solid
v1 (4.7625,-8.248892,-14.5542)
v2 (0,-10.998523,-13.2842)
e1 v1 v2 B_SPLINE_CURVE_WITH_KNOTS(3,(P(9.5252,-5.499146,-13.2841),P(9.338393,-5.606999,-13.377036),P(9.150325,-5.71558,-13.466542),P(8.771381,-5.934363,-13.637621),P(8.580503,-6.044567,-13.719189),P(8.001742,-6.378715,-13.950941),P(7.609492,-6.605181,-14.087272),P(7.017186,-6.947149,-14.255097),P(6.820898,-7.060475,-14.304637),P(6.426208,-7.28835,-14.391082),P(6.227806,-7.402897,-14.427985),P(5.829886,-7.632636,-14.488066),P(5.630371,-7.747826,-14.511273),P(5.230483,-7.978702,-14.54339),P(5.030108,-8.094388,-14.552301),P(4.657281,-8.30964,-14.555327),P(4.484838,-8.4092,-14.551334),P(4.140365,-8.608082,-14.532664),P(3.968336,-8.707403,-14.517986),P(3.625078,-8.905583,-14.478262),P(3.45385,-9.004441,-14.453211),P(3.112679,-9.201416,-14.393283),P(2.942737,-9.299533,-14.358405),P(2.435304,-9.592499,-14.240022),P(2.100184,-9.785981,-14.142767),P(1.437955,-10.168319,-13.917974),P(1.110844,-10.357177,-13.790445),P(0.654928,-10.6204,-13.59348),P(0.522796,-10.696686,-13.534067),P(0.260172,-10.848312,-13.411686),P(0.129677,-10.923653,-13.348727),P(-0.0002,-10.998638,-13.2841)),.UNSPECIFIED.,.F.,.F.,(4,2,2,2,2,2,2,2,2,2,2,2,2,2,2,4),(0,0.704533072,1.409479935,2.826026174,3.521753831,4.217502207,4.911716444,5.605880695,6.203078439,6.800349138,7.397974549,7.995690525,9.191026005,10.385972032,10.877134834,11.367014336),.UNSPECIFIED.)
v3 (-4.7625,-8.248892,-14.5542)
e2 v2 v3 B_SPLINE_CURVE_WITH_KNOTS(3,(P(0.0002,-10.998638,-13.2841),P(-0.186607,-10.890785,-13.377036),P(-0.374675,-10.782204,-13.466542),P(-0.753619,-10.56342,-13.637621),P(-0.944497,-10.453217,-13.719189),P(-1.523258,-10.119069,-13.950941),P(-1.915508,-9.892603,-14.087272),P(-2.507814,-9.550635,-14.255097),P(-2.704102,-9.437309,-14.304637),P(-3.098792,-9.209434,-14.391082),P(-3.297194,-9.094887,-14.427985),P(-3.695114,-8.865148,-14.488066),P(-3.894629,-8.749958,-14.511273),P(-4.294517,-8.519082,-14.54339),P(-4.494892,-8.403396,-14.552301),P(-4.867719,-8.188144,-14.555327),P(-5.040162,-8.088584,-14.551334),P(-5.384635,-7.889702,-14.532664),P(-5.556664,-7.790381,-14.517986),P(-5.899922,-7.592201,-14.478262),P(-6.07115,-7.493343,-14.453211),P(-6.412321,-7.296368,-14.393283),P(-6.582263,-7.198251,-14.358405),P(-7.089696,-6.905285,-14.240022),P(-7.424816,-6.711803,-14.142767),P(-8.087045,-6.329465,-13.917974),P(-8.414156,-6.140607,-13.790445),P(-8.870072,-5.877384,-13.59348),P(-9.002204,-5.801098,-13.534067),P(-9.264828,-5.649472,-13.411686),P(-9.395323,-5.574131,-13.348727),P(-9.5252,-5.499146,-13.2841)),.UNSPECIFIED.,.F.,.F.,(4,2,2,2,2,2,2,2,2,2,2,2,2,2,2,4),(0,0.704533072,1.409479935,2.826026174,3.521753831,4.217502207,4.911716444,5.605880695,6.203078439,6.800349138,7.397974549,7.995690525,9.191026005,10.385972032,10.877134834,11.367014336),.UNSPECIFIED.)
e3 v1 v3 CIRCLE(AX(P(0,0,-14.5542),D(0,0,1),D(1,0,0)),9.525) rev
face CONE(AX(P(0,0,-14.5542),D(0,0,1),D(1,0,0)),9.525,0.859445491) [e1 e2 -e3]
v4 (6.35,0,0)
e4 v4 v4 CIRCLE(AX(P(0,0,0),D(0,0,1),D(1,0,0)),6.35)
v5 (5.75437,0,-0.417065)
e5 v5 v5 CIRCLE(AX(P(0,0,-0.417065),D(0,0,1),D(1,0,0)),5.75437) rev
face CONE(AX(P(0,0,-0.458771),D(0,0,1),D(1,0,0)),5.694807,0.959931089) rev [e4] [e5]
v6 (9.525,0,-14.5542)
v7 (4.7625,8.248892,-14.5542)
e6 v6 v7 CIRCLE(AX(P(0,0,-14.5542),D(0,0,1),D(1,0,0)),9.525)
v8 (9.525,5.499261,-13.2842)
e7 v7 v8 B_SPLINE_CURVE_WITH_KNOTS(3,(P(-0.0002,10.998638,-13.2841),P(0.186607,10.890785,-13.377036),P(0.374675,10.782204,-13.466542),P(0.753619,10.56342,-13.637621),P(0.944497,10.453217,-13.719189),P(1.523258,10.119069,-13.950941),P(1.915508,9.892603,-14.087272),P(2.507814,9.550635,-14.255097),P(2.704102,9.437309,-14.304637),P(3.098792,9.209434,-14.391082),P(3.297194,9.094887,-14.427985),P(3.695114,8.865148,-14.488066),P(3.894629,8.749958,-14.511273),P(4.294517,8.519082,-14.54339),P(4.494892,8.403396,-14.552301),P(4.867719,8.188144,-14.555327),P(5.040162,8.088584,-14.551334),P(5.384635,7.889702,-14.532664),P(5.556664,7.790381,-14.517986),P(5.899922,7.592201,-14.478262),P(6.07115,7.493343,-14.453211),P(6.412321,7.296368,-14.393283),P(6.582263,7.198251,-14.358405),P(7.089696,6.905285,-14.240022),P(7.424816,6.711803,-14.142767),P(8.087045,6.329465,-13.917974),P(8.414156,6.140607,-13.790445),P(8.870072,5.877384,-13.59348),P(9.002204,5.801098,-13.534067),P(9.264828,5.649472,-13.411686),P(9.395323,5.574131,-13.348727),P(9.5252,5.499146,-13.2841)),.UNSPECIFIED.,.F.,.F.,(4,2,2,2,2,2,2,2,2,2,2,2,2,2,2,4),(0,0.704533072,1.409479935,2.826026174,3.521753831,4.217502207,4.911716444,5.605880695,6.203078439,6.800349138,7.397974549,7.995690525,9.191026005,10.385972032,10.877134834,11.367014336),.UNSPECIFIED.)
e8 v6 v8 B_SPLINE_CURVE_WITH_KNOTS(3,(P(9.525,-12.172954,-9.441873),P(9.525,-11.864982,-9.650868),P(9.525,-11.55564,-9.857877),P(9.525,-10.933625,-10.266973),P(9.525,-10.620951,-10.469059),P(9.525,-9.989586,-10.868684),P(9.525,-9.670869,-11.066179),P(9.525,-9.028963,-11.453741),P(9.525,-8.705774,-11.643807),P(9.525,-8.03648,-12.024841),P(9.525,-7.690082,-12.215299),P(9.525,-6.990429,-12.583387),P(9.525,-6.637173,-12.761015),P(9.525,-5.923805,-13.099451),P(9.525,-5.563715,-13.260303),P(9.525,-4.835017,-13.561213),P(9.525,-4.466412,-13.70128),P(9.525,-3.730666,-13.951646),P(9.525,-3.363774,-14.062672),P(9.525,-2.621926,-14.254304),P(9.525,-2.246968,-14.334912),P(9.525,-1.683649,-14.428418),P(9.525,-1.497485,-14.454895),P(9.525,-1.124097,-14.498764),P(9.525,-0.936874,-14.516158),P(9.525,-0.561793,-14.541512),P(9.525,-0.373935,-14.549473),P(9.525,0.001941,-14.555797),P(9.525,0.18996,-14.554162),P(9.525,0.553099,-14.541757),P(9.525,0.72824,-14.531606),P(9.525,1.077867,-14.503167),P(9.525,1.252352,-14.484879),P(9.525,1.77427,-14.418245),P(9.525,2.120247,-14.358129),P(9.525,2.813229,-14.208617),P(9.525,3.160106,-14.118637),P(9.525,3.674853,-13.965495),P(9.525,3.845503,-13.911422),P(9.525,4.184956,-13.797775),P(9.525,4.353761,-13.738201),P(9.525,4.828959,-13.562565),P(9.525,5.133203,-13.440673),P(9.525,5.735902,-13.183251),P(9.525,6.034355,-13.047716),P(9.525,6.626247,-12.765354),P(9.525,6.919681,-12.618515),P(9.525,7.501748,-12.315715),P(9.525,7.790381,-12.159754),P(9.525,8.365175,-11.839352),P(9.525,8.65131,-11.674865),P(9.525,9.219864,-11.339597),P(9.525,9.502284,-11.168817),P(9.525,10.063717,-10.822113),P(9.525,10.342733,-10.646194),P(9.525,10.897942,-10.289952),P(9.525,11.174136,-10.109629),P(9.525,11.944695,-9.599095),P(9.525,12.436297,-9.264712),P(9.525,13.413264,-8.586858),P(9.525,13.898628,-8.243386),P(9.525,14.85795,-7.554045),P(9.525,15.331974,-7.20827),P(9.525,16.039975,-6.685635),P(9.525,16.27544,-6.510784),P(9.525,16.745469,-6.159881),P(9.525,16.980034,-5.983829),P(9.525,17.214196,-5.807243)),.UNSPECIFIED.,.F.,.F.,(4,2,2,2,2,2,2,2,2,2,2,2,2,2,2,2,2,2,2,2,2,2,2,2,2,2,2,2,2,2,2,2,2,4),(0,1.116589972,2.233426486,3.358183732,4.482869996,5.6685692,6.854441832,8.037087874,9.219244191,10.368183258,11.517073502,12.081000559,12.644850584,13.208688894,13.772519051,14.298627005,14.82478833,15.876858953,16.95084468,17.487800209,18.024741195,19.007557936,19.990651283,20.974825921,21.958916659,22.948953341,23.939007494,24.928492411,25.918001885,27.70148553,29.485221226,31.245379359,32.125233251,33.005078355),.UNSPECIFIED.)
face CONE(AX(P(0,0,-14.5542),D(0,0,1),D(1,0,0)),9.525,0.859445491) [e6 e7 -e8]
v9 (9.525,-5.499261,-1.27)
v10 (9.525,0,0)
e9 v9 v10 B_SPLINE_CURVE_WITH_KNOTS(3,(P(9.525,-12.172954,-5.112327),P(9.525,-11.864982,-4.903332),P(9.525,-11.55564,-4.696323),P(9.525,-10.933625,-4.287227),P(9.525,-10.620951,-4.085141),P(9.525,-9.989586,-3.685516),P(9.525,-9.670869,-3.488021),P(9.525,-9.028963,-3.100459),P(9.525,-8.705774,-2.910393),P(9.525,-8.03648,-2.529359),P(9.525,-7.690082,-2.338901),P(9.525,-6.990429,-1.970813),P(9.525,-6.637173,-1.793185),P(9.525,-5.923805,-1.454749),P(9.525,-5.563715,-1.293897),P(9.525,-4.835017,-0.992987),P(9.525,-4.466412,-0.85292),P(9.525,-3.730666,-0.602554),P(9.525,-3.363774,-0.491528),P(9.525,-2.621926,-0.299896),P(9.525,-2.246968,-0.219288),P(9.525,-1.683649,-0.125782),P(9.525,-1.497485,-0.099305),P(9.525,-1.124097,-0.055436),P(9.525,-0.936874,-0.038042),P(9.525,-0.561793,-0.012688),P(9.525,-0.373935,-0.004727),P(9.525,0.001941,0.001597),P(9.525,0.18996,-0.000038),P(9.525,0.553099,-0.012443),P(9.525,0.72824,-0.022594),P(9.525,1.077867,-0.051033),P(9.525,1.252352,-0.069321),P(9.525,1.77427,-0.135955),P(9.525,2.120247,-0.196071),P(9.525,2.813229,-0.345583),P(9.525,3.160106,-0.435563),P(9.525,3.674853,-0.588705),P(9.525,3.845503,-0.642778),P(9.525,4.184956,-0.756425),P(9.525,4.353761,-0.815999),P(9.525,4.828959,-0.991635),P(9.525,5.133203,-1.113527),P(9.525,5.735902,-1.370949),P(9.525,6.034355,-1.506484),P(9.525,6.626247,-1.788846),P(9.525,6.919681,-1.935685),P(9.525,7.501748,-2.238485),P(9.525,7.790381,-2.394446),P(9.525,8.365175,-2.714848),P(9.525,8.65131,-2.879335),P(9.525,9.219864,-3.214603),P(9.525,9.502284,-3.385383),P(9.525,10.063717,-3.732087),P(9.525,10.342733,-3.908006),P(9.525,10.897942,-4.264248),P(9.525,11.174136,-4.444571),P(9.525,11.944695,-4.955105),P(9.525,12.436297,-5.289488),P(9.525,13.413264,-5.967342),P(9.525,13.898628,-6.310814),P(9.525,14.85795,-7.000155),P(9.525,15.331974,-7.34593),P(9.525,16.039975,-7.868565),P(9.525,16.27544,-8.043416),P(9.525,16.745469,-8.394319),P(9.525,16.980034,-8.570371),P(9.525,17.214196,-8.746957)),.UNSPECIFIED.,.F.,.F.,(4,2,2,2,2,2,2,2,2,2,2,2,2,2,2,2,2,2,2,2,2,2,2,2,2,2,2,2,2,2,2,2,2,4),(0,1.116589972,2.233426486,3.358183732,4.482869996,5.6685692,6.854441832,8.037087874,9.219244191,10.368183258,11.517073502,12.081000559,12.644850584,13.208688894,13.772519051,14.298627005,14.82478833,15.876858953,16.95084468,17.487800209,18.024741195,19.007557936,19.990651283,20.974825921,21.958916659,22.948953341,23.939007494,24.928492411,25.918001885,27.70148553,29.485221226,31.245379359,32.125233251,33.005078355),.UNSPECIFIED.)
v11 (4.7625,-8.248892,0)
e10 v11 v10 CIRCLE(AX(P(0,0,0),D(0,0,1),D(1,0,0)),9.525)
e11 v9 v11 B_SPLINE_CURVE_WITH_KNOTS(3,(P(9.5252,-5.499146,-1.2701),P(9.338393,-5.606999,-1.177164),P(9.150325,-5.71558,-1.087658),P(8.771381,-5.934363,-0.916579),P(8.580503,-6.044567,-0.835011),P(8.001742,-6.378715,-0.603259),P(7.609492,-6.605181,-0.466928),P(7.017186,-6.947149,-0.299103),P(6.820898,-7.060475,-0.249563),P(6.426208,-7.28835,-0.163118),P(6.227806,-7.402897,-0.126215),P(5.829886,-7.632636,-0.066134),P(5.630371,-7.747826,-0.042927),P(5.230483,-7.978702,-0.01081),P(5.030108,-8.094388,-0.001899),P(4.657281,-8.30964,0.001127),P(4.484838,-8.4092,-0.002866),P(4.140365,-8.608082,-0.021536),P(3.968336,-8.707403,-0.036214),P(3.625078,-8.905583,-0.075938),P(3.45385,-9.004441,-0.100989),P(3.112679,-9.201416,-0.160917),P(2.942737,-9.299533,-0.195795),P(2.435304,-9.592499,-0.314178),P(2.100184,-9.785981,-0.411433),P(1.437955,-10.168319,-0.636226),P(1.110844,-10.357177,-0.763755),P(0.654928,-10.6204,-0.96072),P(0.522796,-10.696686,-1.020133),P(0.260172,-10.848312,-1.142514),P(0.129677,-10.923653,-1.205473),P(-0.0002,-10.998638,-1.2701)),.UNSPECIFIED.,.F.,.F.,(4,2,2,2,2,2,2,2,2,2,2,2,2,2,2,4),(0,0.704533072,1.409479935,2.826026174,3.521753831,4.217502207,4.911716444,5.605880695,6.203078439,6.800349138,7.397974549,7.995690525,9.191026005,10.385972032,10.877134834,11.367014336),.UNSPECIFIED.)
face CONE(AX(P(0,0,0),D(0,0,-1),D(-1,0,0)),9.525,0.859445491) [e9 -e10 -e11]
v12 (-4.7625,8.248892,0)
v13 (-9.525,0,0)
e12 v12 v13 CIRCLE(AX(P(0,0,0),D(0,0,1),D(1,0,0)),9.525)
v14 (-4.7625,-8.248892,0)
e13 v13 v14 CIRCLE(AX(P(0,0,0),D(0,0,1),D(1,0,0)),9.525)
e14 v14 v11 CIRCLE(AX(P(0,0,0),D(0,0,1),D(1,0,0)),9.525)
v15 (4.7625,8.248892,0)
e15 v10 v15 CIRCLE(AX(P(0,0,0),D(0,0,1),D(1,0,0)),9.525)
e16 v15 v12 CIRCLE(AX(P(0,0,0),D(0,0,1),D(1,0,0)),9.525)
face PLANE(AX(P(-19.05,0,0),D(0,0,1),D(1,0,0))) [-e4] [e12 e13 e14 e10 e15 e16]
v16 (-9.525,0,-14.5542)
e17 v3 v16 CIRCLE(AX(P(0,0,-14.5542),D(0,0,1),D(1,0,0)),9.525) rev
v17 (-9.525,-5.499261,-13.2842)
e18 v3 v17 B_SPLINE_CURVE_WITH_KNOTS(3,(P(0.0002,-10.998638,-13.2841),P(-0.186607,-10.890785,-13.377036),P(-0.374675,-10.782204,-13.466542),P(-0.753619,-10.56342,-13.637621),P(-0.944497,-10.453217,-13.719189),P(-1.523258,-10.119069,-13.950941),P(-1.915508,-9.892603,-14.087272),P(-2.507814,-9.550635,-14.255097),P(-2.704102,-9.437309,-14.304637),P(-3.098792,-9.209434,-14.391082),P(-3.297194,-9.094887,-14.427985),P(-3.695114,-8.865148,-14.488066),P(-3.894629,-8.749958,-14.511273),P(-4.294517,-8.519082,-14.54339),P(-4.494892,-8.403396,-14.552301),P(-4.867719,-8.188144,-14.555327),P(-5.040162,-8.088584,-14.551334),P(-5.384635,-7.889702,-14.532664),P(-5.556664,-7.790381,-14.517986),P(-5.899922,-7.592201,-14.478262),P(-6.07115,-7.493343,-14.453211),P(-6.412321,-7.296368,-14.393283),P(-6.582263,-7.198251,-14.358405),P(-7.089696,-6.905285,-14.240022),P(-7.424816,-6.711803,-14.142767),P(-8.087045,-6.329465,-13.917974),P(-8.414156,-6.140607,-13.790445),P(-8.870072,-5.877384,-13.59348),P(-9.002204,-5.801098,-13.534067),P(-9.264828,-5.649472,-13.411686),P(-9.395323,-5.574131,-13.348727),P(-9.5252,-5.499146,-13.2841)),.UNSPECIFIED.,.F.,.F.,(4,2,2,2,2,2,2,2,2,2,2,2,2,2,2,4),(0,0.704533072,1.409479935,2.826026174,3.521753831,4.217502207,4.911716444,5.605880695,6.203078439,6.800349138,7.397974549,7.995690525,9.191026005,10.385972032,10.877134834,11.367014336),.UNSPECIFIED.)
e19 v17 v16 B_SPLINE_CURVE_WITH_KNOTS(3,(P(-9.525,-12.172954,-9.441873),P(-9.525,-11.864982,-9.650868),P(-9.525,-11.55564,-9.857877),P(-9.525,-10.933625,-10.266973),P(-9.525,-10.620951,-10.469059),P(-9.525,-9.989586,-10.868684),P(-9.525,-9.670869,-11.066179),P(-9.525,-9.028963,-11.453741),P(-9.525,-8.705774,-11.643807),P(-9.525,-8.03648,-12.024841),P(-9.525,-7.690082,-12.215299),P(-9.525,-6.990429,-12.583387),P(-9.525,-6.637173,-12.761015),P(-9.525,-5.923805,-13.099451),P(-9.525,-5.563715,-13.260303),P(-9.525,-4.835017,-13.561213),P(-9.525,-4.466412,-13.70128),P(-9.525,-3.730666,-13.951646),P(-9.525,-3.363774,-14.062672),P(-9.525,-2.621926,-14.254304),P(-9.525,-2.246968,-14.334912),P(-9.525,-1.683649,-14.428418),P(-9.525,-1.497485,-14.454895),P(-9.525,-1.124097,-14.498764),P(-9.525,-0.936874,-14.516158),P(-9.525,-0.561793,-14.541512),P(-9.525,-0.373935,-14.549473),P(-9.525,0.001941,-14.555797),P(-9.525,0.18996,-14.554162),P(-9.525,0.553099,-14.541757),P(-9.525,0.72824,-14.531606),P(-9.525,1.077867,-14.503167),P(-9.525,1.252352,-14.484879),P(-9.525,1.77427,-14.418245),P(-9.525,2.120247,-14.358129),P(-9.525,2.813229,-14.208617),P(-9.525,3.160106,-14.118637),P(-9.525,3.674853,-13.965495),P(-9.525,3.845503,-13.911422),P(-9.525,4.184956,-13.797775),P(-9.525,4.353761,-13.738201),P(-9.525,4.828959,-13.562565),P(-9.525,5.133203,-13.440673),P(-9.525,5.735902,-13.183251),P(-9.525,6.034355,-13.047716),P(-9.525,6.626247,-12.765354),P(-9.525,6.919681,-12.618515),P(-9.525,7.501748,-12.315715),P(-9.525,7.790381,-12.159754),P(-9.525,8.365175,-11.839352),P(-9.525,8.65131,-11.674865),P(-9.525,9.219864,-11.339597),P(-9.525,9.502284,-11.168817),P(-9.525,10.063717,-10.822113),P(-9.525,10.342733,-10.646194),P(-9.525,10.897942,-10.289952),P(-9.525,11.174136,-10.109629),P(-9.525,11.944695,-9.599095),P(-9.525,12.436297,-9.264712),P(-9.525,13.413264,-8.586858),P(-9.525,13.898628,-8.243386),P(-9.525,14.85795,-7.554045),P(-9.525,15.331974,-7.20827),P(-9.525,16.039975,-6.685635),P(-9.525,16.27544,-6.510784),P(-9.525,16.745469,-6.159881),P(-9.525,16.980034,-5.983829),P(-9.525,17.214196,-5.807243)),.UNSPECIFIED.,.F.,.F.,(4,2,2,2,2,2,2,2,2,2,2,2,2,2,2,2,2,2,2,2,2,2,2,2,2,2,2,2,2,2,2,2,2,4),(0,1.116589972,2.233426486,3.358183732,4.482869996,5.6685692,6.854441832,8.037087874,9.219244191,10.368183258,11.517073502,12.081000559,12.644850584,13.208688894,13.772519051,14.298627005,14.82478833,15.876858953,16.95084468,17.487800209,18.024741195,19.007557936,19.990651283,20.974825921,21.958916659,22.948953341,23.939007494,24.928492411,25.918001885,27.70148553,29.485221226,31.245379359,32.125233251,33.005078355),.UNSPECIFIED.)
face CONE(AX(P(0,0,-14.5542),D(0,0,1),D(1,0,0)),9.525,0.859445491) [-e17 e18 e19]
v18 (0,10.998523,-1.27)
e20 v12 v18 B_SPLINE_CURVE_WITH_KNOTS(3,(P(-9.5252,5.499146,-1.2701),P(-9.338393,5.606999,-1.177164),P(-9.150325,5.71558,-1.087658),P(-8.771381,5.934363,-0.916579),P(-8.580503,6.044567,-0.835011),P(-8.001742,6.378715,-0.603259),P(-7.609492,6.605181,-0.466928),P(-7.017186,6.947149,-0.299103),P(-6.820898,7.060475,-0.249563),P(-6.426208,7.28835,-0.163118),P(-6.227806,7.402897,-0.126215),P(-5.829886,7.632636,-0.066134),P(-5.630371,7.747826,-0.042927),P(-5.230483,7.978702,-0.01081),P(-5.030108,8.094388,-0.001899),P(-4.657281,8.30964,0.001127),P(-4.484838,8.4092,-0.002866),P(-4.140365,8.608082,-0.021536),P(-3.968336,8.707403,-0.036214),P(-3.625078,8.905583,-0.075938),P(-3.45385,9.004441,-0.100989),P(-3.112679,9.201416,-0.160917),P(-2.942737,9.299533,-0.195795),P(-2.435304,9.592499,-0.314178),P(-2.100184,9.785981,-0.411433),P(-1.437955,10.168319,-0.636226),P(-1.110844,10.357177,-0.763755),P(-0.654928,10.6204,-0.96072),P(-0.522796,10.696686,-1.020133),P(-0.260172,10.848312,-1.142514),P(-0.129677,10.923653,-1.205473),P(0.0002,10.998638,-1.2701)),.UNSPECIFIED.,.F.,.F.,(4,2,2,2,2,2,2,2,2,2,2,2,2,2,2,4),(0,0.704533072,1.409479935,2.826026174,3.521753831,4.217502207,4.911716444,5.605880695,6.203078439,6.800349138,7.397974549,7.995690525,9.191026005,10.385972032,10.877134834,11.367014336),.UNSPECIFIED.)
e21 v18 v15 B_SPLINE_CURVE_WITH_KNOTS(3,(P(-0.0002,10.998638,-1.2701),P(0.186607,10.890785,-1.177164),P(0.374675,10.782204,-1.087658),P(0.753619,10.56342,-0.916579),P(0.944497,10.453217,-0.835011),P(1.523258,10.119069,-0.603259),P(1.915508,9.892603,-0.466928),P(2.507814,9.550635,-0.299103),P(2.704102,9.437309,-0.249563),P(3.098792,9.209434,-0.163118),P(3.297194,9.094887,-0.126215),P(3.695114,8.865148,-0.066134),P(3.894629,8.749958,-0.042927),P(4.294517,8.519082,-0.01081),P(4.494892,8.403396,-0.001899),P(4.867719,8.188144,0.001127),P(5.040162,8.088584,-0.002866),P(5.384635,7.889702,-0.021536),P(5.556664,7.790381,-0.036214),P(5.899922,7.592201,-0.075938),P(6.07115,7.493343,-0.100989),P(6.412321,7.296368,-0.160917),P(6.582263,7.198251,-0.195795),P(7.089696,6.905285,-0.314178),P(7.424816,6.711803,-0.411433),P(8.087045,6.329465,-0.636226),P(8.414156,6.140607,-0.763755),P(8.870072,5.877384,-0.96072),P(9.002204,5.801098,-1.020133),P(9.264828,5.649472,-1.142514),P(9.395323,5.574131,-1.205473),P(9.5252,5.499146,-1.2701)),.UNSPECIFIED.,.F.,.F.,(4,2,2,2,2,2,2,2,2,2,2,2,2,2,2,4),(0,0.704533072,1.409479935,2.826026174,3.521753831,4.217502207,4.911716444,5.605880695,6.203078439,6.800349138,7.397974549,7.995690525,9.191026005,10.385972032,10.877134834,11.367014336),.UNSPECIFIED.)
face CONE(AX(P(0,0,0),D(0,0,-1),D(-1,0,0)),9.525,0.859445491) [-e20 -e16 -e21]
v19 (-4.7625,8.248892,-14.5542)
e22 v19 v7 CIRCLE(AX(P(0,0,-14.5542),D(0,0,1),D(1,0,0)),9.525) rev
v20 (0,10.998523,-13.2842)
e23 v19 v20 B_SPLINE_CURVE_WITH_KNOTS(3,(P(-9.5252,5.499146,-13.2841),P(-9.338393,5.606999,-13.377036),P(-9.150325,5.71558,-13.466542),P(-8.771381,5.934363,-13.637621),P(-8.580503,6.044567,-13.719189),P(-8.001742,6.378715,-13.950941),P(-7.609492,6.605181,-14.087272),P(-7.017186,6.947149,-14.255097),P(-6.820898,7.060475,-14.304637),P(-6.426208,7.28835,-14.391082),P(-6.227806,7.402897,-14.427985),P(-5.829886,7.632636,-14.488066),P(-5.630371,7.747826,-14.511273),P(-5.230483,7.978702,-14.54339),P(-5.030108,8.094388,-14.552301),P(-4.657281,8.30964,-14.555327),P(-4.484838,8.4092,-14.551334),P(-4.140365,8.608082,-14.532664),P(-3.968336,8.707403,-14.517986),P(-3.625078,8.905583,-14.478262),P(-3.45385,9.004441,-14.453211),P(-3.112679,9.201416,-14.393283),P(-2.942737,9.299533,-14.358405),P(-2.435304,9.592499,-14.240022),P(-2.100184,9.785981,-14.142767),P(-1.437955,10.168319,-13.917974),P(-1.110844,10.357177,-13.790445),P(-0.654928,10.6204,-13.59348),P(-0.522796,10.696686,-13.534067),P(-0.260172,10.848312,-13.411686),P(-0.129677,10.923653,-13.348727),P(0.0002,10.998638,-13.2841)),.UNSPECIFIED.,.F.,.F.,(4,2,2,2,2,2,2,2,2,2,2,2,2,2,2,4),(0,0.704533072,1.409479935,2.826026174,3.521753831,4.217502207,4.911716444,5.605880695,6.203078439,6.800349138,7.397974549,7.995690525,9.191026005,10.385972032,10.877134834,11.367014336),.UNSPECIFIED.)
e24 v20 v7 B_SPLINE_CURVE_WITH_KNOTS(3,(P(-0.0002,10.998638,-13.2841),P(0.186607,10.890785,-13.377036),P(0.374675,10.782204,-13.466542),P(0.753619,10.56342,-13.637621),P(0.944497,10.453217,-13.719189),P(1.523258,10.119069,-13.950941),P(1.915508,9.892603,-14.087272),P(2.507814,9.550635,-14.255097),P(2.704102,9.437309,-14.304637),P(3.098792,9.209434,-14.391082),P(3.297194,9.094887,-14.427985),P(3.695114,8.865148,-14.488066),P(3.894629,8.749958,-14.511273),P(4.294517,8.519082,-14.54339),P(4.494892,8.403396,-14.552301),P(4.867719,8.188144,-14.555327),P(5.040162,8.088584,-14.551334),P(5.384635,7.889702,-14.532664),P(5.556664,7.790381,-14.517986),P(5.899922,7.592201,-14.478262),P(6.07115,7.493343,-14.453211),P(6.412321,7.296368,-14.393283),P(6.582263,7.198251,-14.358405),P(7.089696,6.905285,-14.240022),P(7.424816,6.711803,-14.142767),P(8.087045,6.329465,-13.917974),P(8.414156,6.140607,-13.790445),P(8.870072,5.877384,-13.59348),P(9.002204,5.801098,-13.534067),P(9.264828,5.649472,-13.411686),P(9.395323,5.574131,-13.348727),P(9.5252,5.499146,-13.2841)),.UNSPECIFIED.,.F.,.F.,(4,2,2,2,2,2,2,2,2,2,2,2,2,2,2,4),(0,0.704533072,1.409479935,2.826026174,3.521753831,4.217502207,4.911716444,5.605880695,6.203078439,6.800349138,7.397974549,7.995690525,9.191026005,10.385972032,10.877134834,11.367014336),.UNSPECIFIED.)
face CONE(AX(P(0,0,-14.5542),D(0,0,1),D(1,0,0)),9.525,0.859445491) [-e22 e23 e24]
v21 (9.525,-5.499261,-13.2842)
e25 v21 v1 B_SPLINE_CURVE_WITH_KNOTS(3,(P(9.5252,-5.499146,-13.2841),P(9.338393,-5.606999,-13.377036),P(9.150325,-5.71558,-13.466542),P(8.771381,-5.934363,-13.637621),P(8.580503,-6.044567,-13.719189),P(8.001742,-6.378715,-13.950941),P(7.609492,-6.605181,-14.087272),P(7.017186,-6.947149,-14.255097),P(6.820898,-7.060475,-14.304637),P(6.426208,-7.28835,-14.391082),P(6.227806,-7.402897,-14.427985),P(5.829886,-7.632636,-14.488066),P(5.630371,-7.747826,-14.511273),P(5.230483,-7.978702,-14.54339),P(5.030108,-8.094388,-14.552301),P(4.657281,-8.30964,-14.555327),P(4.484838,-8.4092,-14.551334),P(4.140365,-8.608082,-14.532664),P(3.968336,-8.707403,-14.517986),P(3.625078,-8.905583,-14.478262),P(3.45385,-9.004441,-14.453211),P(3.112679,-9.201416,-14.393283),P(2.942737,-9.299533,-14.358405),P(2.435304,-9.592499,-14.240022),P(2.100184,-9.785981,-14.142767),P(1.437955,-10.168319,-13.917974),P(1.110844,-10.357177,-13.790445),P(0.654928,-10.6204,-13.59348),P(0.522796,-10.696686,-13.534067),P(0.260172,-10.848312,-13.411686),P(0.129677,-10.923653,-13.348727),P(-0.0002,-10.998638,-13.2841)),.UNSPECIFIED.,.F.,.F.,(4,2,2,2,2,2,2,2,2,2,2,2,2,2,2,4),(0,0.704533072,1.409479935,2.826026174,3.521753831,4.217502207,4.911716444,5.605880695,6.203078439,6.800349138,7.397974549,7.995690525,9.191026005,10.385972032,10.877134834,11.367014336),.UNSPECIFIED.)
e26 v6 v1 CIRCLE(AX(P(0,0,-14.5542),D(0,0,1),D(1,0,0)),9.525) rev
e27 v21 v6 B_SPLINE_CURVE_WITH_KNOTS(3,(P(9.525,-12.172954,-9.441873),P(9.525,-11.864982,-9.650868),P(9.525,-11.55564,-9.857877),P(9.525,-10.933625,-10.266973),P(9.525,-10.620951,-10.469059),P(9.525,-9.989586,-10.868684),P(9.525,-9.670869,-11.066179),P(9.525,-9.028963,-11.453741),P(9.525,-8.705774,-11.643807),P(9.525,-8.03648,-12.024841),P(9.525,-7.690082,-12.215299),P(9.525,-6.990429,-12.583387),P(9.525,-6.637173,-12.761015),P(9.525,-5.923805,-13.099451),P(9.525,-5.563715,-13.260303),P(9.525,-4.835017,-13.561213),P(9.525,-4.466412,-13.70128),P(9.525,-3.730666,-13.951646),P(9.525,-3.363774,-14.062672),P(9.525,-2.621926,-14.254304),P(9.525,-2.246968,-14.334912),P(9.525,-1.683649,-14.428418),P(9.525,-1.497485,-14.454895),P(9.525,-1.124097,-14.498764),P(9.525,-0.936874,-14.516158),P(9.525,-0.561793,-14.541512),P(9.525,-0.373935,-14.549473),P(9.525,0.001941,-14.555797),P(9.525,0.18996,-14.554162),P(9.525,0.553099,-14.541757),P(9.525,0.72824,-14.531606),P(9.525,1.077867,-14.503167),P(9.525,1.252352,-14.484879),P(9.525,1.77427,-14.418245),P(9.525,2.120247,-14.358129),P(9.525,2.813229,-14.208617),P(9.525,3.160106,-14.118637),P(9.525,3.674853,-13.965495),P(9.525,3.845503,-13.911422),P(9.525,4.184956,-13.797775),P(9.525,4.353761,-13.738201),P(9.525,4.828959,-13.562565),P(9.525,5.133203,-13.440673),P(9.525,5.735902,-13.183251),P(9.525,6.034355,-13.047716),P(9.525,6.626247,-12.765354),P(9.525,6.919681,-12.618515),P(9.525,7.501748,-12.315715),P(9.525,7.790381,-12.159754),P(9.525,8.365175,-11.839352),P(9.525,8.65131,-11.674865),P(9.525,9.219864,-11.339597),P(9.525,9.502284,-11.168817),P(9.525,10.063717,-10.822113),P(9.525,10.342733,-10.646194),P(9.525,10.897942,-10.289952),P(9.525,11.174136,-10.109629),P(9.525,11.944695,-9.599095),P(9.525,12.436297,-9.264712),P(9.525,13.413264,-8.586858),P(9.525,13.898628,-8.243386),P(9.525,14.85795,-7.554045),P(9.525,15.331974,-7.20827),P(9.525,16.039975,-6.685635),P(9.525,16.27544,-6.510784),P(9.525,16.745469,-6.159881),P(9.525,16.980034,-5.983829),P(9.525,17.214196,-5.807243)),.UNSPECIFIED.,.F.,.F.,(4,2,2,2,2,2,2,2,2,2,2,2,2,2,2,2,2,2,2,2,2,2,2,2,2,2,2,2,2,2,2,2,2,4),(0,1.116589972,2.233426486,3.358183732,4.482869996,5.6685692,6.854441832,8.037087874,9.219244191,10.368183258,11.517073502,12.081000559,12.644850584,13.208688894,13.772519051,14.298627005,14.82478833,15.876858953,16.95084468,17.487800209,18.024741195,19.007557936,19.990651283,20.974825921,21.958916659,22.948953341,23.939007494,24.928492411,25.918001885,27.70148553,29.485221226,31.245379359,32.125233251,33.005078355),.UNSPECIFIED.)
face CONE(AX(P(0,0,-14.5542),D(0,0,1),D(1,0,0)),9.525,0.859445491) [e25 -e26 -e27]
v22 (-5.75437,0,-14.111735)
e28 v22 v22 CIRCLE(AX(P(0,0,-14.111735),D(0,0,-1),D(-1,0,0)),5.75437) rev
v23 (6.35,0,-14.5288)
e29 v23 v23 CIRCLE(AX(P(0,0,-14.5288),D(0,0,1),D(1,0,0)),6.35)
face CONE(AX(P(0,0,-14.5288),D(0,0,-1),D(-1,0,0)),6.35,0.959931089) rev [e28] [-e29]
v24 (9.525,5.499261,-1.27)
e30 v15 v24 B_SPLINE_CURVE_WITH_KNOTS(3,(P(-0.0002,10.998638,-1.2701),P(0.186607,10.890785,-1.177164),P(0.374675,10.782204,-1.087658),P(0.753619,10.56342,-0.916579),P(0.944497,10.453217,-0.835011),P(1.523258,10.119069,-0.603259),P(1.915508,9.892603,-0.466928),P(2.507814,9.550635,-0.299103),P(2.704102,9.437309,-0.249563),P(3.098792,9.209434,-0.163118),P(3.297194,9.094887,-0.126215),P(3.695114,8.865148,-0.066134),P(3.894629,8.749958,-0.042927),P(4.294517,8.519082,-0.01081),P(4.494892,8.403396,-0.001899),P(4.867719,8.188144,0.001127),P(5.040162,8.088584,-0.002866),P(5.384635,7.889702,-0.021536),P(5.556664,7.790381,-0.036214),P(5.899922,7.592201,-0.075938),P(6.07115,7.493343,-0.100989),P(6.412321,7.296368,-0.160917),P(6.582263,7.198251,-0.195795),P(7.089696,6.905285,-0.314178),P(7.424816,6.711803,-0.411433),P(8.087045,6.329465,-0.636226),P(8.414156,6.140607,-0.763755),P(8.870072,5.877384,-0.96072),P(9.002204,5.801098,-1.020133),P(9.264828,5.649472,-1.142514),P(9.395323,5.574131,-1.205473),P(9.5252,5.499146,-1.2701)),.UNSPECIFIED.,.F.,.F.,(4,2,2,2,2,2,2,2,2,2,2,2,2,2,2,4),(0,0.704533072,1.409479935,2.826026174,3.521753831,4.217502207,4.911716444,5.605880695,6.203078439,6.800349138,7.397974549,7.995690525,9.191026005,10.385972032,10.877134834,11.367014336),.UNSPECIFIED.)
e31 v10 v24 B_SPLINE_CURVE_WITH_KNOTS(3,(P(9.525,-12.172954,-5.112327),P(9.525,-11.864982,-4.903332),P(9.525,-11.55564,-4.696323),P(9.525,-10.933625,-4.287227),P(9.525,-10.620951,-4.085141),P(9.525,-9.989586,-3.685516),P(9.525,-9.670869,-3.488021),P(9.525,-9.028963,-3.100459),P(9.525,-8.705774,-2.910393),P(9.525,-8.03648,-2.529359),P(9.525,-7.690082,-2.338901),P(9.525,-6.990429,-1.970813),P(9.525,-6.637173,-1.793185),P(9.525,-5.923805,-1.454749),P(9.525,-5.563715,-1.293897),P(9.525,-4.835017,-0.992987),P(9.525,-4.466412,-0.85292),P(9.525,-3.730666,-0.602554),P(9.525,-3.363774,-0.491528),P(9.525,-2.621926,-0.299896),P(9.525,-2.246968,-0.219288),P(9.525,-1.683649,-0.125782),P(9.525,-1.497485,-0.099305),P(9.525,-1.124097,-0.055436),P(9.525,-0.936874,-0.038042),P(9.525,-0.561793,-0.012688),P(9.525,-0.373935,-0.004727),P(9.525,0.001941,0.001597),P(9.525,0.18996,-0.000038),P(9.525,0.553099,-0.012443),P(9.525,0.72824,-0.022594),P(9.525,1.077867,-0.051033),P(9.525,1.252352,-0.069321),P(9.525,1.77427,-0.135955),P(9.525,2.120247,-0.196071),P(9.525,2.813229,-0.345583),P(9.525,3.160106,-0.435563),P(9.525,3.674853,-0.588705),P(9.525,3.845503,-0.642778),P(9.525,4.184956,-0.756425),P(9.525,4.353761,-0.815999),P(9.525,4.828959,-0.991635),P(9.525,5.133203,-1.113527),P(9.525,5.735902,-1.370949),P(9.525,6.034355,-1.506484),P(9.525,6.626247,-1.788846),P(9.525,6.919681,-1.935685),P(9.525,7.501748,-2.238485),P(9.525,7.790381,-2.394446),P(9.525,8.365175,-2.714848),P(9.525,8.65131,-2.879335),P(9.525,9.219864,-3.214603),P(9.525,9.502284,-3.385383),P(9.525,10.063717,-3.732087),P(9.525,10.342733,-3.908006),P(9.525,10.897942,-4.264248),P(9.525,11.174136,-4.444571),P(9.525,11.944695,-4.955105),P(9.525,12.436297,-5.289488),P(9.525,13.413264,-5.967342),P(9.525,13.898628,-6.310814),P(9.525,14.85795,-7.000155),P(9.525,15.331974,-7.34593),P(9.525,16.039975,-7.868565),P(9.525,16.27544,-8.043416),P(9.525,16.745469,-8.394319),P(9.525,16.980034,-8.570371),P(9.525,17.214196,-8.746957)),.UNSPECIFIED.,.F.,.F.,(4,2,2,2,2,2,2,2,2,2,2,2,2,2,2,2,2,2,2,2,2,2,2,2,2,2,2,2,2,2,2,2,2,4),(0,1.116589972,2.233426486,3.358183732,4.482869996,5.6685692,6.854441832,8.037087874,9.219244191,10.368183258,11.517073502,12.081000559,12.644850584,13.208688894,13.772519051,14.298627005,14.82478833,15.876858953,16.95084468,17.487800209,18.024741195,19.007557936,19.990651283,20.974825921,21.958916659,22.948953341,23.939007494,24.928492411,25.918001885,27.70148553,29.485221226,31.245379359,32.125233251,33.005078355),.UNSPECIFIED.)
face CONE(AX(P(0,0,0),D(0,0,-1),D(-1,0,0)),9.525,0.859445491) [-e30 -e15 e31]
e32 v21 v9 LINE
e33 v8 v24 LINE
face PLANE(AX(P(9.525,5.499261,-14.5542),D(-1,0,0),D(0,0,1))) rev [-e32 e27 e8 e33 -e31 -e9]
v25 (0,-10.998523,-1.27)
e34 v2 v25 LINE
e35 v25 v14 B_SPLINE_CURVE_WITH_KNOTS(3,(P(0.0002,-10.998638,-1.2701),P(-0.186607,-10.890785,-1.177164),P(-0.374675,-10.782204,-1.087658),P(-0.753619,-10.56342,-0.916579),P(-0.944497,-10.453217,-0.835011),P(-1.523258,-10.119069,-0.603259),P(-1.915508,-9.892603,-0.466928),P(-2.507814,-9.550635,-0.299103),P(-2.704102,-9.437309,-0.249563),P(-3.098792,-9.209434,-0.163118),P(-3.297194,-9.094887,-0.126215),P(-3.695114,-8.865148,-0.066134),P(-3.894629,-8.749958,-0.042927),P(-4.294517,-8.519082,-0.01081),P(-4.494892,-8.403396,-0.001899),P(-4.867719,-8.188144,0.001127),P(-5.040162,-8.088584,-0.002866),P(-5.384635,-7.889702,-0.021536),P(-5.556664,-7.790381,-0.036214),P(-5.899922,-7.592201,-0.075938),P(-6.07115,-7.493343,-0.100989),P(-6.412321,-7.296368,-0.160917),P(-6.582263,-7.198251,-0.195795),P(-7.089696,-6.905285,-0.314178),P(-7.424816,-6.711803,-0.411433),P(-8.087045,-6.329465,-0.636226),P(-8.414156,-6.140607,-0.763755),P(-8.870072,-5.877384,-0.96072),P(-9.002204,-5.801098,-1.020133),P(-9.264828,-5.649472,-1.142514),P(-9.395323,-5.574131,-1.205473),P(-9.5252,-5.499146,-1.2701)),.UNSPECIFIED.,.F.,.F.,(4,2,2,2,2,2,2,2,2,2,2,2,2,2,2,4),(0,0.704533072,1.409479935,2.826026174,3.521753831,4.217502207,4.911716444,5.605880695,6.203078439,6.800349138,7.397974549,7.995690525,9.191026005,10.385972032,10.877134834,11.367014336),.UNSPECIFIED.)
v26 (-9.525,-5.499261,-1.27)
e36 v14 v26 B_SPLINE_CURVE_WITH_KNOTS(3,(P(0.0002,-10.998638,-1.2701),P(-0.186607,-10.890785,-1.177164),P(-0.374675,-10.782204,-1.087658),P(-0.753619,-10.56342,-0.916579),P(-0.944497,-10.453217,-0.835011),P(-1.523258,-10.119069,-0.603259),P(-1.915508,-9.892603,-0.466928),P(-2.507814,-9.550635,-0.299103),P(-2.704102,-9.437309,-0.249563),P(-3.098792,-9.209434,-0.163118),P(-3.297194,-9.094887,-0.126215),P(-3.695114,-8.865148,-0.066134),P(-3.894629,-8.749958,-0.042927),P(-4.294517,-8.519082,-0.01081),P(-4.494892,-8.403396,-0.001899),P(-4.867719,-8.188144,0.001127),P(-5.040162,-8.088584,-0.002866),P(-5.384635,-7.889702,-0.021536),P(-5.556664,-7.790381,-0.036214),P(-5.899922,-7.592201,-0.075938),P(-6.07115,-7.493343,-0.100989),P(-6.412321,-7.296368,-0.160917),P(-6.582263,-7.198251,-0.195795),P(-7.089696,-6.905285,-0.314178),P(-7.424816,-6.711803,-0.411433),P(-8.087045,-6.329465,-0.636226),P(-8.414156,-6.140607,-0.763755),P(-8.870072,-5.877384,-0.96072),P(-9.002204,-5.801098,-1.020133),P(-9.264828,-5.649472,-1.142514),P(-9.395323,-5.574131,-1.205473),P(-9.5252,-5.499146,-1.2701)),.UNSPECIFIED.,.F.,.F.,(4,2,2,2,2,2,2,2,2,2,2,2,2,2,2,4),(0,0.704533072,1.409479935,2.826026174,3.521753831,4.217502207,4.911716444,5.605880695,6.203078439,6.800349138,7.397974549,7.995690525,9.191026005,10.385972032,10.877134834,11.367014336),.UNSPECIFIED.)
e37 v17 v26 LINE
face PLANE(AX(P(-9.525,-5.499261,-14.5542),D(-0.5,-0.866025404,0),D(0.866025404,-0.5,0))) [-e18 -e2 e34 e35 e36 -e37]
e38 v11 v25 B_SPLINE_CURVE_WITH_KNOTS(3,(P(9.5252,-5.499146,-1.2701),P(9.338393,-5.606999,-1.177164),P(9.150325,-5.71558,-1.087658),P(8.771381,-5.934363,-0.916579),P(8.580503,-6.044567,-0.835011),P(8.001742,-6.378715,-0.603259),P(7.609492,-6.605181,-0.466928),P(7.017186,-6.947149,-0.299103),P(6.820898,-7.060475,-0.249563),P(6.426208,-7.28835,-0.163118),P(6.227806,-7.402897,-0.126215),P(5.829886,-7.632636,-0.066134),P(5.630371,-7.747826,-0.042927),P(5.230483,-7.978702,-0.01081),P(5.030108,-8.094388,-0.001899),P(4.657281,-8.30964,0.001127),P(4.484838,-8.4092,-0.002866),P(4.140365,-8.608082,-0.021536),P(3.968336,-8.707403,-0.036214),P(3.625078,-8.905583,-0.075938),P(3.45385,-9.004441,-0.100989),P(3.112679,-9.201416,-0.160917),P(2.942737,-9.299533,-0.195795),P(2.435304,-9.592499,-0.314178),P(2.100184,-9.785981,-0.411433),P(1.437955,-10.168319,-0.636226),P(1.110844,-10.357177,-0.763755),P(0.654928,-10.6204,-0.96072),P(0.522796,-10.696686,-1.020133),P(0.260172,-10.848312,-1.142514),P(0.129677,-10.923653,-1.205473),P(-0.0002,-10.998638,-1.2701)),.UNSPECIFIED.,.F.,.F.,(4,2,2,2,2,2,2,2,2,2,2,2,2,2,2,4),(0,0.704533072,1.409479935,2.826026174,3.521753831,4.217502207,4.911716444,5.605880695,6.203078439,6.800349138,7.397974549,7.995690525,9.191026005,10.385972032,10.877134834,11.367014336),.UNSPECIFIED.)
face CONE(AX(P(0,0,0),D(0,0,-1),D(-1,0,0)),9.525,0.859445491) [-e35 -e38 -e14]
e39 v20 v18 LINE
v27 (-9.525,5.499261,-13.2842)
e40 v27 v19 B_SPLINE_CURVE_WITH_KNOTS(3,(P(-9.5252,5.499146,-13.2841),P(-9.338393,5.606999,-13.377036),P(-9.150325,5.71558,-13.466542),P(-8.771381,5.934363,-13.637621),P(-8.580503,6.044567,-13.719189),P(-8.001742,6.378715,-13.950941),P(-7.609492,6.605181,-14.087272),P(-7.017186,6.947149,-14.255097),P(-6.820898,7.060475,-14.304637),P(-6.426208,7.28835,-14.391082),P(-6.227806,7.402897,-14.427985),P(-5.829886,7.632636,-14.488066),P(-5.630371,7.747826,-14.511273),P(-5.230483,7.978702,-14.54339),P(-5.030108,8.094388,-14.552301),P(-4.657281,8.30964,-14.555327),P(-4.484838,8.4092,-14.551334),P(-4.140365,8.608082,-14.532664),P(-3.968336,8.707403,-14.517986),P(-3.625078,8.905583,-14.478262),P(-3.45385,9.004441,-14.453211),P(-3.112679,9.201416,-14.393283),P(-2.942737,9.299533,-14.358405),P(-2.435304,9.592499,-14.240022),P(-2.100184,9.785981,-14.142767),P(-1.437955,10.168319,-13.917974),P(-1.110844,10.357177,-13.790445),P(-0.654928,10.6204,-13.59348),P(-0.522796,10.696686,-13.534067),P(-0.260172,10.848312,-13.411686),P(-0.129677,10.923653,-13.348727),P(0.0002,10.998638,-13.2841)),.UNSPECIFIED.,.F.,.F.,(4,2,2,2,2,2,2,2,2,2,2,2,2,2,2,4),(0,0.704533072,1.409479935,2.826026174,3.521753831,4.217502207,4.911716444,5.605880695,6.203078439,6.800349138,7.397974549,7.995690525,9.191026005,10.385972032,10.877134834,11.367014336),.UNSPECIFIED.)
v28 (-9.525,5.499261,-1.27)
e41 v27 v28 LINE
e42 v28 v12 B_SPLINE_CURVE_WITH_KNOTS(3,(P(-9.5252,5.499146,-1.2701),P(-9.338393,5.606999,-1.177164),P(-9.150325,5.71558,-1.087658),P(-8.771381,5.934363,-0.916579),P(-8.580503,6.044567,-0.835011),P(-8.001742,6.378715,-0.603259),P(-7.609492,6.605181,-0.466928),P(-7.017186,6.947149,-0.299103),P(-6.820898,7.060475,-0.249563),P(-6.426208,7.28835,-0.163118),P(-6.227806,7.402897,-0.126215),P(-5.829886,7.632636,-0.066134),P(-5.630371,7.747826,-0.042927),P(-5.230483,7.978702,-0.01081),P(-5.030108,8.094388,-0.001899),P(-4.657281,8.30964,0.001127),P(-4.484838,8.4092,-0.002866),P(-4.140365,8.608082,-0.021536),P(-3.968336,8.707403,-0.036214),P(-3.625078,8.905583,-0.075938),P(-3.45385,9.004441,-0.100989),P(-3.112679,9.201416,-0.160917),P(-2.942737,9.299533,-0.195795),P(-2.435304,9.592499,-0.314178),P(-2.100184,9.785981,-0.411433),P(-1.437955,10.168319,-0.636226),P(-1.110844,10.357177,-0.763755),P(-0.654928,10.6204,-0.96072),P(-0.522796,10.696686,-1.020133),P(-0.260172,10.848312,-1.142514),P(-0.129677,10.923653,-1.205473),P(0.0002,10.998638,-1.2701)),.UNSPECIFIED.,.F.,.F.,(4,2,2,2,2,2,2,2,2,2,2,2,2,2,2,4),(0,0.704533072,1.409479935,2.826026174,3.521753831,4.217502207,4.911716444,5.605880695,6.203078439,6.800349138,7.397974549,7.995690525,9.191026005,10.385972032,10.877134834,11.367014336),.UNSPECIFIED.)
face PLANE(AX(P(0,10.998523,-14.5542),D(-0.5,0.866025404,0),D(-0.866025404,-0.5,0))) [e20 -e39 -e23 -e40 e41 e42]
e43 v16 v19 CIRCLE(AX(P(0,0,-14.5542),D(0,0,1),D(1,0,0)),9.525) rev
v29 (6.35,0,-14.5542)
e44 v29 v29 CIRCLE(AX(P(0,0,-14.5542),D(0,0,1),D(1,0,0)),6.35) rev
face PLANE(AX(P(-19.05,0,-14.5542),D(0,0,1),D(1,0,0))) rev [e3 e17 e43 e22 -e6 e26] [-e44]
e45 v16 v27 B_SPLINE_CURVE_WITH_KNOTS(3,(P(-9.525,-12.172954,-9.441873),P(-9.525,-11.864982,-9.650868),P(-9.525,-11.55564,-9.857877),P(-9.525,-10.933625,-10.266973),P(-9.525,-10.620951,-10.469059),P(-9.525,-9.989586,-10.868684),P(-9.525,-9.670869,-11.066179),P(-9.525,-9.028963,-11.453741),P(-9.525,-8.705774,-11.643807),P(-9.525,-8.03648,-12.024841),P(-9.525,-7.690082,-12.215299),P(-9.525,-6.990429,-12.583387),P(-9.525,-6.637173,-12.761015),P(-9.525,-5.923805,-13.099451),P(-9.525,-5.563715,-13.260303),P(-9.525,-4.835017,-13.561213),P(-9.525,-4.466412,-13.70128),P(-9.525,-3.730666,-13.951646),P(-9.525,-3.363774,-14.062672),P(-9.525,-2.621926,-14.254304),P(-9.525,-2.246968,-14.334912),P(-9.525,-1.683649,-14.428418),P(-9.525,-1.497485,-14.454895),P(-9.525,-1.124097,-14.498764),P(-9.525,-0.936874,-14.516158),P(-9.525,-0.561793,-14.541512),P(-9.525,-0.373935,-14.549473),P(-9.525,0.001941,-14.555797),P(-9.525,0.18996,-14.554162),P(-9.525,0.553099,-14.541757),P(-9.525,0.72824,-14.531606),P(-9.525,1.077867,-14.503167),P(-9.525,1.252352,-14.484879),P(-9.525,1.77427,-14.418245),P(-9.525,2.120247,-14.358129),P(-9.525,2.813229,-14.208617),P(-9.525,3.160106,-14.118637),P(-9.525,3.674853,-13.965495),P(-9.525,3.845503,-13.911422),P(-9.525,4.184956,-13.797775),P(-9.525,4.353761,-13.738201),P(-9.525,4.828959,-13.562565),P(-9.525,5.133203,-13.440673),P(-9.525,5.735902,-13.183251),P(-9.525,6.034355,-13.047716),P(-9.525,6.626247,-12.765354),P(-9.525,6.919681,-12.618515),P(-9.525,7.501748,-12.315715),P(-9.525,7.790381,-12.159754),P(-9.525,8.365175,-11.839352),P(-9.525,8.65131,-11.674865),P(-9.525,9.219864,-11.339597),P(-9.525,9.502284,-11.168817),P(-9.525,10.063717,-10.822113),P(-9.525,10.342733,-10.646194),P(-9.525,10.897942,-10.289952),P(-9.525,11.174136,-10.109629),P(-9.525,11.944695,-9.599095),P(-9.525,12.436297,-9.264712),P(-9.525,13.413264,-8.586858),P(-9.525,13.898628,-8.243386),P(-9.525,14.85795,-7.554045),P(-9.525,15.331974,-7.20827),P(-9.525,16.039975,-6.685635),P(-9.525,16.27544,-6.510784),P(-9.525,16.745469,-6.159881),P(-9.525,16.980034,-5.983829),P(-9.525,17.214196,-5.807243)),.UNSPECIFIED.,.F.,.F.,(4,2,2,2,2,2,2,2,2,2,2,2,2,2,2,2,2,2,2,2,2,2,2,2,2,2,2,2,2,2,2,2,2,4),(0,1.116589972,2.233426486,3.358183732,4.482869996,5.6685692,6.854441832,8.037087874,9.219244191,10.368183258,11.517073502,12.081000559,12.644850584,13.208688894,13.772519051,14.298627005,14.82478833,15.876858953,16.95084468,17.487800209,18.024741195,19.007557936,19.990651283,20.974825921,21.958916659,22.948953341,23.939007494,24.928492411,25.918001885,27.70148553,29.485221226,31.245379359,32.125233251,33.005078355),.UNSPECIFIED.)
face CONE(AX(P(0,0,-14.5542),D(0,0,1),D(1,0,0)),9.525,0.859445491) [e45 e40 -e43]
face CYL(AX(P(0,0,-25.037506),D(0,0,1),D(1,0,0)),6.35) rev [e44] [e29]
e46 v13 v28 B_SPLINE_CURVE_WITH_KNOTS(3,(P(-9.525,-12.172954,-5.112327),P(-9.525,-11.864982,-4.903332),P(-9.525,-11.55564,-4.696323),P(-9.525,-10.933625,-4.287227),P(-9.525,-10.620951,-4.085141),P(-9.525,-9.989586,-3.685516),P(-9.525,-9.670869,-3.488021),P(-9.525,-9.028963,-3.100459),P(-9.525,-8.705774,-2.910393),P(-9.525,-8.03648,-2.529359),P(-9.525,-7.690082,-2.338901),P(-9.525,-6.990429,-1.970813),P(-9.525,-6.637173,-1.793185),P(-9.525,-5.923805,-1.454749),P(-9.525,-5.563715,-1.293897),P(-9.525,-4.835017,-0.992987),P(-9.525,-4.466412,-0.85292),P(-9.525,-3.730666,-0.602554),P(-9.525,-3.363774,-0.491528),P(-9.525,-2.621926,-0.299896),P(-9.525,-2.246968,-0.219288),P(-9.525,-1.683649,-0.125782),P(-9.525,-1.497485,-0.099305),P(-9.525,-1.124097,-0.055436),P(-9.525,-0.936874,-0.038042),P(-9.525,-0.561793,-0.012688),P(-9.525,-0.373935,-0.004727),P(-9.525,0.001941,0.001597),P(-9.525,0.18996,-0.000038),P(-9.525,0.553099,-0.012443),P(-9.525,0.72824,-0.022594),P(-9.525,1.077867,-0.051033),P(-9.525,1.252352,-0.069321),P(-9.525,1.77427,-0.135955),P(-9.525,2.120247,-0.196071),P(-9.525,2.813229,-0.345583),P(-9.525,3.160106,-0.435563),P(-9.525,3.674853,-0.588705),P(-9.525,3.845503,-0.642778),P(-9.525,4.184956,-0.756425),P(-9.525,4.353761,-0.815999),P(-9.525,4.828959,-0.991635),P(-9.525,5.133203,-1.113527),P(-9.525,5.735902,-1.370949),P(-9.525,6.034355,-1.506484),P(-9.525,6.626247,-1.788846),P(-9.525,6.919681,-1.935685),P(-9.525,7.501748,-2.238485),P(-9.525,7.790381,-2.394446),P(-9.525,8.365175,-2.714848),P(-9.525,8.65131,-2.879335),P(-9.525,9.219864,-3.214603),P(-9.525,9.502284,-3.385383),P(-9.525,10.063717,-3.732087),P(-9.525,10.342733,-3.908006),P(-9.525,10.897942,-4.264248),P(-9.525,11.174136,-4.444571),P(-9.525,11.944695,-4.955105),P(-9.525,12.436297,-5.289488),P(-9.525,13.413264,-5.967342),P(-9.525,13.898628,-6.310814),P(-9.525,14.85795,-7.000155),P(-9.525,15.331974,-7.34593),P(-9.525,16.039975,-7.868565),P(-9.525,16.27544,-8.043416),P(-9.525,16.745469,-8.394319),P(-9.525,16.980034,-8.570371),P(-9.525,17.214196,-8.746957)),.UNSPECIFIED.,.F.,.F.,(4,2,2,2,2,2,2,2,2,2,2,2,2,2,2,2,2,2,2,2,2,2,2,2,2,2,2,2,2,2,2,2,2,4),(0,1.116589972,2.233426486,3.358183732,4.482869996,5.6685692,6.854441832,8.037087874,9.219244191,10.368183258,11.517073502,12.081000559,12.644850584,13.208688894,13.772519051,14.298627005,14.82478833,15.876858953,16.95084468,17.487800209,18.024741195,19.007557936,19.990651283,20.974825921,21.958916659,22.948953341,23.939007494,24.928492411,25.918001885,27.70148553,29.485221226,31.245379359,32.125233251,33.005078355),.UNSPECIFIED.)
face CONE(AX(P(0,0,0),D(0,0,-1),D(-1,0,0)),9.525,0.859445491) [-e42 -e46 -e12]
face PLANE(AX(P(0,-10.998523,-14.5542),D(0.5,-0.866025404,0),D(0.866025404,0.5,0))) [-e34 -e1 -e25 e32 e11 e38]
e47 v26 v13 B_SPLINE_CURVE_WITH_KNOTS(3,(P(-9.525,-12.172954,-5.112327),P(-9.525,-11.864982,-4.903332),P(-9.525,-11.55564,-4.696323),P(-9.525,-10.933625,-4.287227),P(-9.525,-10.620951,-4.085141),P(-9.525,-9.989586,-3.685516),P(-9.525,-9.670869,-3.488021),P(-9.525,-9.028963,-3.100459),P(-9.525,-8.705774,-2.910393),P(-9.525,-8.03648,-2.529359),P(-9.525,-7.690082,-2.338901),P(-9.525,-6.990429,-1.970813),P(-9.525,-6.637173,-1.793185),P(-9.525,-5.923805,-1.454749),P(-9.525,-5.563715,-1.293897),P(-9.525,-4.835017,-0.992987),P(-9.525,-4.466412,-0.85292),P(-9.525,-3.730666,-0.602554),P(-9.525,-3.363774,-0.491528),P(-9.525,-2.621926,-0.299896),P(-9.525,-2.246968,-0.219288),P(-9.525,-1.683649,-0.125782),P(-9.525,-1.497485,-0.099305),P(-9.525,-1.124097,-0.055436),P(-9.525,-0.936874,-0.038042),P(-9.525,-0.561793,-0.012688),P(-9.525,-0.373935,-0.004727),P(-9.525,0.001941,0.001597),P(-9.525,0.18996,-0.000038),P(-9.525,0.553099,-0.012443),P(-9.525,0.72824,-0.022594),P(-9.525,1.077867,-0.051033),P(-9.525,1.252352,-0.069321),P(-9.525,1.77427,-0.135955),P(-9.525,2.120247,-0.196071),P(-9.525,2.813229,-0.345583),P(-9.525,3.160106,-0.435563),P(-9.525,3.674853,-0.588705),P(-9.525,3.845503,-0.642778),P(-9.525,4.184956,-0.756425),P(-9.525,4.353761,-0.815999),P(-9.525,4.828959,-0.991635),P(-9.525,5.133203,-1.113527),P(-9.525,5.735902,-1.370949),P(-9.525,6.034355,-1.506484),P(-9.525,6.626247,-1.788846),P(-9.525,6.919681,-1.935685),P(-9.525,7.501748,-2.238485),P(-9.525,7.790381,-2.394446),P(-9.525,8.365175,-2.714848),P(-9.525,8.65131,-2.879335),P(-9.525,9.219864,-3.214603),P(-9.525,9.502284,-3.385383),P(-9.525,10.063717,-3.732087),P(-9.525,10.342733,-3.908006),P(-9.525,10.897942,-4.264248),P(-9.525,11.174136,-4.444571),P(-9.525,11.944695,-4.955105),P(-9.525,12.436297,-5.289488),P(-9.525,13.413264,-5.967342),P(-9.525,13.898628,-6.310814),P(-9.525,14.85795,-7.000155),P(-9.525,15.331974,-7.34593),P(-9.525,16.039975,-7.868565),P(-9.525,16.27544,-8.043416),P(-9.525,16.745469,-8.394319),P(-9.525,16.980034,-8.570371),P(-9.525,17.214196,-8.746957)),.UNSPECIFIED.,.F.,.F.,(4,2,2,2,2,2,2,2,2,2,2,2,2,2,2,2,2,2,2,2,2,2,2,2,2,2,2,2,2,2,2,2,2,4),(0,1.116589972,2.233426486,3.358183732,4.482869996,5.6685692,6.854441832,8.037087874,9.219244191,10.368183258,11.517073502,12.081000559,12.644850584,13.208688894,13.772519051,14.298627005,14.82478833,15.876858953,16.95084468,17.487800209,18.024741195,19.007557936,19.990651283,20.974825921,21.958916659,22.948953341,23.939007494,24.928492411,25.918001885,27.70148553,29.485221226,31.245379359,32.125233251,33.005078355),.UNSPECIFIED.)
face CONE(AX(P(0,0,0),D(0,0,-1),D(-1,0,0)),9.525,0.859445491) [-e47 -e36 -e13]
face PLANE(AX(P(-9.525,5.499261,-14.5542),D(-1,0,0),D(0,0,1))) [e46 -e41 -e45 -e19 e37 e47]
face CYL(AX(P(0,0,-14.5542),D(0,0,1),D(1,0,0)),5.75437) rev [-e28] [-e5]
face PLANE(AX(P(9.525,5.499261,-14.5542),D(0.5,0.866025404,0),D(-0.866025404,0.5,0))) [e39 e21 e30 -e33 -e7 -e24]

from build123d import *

# Parameters (mm, degrees)
THREADSCHEMATIC_START     = -14.5542
THREADSCHEMATIC_OUTLINE_R = 5.75437
THREADSCHEMATIC_DEPTH     = 14.5542


# Read off the part's stored shape, not the designer's step: ThreadSchematic
with BuildPart() as part:
    # ThreadSchematic outline → ThreadSchematic (new body)
    with BuildSketch(Plane.XY.offset(THREADSCHEMATIC_START)):
        Polygon((9.525, 5.499261314), (0, 10.998522628), (-9.525, 5.499261314), (-9.525, -5.499261314), (0, -10.998522628), (9.525, -5.499261314), align=None)
        Circle(THREADSCHEMATIC_OUTLINE_R, mode=Mode.SUBTRACT)
    extrude(amount=THREADSCHEMATIC_DEPTH)

    # Sketch3 → Double-Chamfer (revolve, cut)
    with BuildSketch(Plane(origin=(0, 0, 0), x_dir=(0, 0, -1), z_dir=(1, 0, 0))):
        Polygon((14.5542, 9.525), (13.2842, 10.998522628), (13.2842, 23.698522628), (27.2542, 23.698522628), (27.2542, 9.525), align=None)
        Polygon((1.27, 23.698522628), (-12.7, 23.698522628), (-12.7, 9.525), (0, 9.525), (1.27, 10.998522628), align=None)
    revolve(axis=Axis((0, 0, 0), (0, 0, -1)), mode=Mode.SUBTRACT)

    # EndChamferSke → EndChamfer (revolve, cut)
    with BuildSketch(Plane(origin=(0, 0, 0), x_dir=(0, 0, -1), z_dir=(1, 0, 0)), mode=Mode.PRIVATE) as endchamfer_sk:
        Polygon((14.5288, 6.35), (14.070028922, 5.694807), (14.5796, 5.694807), (14.5796, 6.35), align=None)
        Polygon((-0.0508, 6.35), (0, 6.35), (0.458771078, 5.694807), (-0.0508, 5.694807), align=None)
    revolve(endchamfer_sk.sketch.rotate(Axis((0, 0, -25.037505729), (0, 0, -1)), 90), axis=Axis((0, 0, -25.037505729), (0, 0, -1)), mode=Mode.SUBTRACT)


solid = part.part
